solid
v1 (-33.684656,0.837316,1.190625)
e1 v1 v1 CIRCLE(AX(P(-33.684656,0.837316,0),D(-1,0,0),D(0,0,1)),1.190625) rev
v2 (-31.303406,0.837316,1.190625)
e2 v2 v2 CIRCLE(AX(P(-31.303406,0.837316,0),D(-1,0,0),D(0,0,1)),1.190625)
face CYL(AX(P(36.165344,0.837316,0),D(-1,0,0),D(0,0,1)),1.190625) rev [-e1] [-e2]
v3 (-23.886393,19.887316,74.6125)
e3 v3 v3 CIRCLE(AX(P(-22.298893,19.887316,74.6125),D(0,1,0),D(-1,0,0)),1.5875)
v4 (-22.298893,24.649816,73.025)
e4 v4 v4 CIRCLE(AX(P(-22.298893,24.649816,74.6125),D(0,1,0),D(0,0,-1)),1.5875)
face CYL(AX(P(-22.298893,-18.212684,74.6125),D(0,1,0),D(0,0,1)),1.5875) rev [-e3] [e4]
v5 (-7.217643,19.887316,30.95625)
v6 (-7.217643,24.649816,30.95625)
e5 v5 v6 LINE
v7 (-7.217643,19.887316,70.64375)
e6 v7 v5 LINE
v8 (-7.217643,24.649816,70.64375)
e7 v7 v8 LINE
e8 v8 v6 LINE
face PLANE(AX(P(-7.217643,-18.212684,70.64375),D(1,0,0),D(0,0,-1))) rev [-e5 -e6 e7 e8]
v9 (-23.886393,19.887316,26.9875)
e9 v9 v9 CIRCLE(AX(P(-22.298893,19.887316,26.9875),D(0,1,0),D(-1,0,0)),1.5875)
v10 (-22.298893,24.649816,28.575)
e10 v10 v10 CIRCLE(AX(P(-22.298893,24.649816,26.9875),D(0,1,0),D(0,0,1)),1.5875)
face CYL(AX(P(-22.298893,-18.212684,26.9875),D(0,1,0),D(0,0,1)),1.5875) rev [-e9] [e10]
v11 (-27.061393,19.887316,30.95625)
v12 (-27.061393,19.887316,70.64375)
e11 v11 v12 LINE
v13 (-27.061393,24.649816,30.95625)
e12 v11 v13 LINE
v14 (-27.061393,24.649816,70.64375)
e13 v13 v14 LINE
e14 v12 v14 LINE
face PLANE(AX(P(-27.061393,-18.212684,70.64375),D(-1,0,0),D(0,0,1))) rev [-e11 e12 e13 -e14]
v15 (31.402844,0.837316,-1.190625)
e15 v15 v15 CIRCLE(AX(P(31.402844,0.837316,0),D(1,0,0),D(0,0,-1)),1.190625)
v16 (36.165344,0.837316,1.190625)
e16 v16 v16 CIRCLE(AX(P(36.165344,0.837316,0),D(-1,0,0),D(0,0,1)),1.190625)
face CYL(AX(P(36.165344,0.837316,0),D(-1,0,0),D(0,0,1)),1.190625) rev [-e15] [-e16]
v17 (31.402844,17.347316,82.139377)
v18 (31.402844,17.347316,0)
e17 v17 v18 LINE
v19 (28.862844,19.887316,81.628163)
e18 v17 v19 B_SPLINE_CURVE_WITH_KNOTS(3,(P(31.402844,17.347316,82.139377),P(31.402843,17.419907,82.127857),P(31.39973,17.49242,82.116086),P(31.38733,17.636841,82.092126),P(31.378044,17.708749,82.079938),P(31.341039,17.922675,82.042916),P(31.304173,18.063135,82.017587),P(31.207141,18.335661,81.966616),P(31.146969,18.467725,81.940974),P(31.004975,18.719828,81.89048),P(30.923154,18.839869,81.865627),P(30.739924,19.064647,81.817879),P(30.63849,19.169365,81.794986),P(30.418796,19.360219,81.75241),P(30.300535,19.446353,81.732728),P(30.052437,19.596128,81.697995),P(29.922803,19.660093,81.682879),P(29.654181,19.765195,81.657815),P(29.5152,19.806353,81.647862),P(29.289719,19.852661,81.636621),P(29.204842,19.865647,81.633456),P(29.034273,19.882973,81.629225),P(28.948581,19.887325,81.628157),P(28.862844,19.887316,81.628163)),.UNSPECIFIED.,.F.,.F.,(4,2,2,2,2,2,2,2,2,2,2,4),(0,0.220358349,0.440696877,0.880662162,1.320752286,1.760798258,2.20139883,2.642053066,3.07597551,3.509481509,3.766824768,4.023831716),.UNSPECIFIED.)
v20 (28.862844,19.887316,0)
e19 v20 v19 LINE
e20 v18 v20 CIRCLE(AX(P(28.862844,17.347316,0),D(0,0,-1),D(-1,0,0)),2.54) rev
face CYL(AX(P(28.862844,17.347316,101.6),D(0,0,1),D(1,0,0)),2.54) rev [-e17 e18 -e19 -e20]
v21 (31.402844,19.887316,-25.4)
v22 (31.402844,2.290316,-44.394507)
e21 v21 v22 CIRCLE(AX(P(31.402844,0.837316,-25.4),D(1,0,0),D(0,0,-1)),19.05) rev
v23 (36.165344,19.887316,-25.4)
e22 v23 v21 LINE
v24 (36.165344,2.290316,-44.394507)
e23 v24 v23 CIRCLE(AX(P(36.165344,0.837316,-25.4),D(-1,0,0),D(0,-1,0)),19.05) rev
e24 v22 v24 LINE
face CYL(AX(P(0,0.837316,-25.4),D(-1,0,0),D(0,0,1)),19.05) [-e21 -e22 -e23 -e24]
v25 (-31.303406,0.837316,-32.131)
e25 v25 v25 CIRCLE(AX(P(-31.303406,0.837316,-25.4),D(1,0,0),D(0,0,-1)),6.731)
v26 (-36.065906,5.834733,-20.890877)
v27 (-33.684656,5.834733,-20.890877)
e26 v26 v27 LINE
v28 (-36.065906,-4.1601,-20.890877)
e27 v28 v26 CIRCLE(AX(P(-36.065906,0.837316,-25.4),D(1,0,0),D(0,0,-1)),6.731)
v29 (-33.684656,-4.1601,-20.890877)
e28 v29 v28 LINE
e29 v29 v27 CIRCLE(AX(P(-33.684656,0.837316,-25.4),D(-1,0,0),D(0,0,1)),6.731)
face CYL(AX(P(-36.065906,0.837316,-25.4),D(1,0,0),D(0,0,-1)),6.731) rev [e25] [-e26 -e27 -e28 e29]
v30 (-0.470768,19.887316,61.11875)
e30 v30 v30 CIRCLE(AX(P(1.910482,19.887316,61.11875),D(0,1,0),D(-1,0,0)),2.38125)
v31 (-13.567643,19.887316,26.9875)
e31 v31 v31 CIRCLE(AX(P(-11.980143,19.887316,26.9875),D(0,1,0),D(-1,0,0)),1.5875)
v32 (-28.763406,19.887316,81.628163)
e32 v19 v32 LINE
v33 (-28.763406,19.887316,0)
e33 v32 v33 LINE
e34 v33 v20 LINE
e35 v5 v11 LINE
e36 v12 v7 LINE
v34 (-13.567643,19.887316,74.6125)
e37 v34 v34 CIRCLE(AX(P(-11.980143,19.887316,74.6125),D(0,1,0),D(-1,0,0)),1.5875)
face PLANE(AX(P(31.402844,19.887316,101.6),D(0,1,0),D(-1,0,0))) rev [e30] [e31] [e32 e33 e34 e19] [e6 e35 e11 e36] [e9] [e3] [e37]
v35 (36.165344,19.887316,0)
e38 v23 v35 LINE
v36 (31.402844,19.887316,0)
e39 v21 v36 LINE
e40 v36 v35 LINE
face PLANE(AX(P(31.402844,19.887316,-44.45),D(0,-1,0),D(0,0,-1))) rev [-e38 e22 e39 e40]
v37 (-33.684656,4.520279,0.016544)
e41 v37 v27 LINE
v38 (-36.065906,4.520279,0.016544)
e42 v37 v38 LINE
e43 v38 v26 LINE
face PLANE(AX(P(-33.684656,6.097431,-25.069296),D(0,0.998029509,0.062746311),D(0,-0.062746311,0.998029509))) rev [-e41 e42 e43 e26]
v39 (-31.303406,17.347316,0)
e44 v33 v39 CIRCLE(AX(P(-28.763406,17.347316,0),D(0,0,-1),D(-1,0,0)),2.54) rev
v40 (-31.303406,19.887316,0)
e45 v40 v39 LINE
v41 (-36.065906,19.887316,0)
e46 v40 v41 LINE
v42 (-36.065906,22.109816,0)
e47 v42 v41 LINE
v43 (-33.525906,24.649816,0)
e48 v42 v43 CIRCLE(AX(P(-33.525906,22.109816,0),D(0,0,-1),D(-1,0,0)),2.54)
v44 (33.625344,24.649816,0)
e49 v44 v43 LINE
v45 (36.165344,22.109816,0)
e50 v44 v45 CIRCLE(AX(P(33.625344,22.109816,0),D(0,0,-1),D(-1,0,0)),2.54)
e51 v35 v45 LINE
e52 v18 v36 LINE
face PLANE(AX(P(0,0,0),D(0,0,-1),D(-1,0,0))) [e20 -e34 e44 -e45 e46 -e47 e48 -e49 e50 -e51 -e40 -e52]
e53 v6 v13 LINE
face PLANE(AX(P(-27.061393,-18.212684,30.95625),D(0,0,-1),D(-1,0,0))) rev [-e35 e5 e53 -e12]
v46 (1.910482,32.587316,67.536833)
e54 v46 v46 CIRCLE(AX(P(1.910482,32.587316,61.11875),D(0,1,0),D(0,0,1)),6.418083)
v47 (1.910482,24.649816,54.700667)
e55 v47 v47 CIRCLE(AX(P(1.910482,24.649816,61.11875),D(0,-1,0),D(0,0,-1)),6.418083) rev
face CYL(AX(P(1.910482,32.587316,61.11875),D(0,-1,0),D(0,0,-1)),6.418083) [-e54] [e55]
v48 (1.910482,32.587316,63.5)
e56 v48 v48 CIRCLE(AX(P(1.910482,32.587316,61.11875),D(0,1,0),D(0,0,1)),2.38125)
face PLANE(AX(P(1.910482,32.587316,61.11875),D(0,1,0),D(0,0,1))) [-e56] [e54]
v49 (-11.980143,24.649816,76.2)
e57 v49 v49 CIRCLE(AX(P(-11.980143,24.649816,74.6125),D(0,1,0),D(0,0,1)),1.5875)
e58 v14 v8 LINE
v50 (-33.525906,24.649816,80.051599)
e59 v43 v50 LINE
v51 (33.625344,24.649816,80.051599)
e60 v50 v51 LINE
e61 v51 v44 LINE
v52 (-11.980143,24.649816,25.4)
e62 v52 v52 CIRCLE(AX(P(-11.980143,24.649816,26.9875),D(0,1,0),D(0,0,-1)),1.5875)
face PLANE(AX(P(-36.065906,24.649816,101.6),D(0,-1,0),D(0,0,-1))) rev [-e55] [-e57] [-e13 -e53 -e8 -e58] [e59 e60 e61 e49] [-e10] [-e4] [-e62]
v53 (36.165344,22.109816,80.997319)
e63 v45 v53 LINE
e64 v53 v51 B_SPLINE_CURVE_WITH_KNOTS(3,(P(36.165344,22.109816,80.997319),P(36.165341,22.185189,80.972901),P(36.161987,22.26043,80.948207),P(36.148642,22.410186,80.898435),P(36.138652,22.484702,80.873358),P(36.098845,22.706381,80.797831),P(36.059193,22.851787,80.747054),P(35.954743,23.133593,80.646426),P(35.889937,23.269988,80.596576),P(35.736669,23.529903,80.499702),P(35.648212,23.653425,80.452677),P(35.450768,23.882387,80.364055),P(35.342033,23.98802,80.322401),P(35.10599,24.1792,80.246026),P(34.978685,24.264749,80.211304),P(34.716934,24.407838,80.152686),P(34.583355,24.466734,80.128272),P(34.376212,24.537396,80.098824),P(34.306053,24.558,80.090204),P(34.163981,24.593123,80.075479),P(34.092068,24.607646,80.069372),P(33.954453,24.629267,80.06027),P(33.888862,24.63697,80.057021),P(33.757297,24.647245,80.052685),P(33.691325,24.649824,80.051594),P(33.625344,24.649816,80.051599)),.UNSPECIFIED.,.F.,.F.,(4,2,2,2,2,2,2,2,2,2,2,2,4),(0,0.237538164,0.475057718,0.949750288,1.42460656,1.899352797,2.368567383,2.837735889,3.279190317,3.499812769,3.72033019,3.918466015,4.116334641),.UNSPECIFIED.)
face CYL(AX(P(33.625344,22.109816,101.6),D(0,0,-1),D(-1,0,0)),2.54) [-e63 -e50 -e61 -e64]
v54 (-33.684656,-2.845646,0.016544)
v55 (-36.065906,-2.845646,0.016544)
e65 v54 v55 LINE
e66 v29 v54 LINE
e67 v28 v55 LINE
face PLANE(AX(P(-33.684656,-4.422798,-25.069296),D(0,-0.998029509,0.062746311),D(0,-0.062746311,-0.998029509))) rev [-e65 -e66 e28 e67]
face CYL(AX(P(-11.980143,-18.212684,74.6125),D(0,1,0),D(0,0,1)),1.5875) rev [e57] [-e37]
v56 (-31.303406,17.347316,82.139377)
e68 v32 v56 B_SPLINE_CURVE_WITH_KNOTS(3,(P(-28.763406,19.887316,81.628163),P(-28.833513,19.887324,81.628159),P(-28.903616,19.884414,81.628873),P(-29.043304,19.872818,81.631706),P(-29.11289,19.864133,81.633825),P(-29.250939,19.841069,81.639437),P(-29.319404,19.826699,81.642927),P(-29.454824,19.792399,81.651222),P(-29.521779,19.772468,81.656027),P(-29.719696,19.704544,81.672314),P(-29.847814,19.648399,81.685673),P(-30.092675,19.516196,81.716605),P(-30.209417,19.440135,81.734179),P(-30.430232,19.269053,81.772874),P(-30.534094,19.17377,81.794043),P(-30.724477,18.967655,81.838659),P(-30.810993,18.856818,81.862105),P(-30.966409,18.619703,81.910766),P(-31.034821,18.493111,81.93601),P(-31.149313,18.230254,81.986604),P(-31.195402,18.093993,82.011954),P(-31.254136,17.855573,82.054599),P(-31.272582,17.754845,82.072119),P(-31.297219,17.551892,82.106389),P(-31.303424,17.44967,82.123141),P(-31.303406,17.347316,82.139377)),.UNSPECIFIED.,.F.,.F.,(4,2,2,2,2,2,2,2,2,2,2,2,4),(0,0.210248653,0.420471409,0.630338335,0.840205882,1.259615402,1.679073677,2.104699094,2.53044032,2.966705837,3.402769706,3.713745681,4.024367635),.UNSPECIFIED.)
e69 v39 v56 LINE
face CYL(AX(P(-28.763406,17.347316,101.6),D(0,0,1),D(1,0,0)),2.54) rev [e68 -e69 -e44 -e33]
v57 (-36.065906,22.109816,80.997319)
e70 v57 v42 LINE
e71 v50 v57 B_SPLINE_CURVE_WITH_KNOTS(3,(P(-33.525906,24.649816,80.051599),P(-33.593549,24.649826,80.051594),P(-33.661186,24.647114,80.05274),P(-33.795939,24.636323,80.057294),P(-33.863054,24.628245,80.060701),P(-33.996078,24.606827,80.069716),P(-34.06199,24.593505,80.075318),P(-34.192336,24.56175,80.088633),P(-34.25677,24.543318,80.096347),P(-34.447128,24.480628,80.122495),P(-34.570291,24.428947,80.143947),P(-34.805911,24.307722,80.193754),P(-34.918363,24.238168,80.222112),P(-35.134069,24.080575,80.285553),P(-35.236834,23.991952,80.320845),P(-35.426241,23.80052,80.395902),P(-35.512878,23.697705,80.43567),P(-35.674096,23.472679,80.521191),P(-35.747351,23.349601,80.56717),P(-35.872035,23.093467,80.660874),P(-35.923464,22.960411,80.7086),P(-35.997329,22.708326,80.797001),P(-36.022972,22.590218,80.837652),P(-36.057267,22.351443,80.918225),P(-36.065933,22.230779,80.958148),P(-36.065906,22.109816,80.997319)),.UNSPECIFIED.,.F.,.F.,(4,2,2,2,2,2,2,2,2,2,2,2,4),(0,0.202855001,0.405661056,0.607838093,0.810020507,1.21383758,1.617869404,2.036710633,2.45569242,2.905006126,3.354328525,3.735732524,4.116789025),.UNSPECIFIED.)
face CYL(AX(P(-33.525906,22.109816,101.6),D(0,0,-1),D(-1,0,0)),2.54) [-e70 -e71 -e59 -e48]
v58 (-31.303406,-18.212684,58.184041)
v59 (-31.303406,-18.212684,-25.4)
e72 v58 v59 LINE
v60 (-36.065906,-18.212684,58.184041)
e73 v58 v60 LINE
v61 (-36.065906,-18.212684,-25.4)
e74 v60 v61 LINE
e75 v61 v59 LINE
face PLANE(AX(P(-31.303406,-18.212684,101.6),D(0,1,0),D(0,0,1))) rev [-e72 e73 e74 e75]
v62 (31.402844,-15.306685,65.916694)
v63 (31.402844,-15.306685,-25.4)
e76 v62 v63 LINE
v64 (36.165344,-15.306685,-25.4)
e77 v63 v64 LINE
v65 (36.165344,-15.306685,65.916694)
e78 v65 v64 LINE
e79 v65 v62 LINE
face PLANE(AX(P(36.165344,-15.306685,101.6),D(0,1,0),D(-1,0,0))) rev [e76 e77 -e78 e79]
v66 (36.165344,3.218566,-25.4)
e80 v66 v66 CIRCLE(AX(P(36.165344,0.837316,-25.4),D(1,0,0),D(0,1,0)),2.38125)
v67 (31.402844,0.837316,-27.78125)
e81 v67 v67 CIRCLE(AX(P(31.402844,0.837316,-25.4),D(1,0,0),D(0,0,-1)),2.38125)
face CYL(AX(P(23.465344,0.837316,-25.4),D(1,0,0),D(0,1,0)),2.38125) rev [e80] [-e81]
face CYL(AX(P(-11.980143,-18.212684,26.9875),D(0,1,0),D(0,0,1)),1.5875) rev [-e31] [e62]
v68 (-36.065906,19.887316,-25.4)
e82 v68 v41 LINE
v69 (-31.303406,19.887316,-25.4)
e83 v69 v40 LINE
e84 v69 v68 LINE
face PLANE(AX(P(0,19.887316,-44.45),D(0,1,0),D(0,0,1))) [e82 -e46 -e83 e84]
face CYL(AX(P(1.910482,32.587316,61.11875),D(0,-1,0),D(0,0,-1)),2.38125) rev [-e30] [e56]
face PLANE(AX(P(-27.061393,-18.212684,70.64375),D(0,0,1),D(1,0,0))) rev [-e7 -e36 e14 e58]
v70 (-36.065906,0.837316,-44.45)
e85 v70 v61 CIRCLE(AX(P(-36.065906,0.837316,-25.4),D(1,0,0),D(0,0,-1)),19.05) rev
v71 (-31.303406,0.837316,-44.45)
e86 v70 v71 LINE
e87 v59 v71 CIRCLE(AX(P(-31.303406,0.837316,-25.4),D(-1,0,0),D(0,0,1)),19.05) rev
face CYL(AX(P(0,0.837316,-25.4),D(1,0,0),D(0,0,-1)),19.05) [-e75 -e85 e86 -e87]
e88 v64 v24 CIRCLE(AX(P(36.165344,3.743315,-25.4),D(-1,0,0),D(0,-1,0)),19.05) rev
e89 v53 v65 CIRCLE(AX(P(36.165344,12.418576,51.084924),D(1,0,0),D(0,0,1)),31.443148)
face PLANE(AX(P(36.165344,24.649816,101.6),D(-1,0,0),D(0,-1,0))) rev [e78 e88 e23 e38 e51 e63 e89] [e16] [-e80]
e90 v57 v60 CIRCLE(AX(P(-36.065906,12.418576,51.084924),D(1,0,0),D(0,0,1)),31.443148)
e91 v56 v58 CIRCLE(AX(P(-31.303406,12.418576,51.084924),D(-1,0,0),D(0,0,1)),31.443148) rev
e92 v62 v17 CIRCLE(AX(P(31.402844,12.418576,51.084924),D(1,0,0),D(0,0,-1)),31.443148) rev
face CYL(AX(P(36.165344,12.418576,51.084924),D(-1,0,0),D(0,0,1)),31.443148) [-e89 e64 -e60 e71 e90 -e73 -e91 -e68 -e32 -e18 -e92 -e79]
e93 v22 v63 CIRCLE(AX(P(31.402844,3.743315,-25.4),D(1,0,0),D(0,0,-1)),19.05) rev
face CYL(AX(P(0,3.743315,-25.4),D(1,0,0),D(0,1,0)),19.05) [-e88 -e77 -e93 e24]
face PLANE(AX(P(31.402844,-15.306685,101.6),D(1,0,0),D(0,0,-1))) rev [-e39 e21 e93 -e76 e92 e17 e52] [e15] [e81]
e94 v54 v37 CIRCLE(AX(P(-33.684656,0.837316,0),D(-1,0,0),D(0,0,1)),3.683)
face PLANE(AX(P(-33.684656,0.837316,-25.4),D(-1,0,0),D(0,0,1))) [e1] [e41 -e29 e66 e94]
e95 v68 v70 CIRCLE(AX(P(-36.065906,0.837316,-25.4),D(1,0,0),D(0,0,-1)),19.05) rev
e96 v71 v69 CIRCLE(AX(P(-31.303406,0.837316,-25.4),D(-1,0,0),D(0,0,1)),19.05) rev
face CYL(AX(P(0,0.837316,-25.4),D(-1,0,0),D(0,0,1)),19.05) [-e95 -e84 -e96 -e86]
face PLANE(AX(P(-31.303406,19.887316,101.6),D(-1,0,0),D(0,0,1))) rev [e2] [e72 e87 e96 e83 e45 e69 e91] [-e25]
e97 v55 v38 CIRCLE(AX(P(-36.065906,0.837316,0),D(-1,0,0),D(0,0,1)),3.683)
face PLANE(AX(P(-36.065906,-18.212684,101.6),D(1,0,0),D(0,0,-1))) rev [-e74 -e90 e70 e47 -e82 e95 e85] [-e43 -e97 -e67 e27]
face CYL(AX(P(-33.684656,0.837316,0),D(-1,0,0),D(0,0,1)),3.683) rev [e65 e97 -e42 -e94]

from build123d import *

# Parameters (mm, degrees)
BOSS_EXTRUDE1_DEPTH = 101.6
SKETCH2_W           = 4.7625
SKETCH2_H           = 38.1
SKETCH2_H_2         = 35.194001629
BOSS_EXTRUDE2_DEPTH = 44.45
FILLET1_R           = 19.05
FILLET4_R           = 2.54
FILLET5_R           = 2.54
SKETCH4_R           = 1.190625
CUT_EXTRUDE1_DEPTH  = 128.07291971
SKETCH5_R           = 1.5875
SKETCH5_W           = 19.84375
SKETCH5_H           = 39.6875
CUT_EXTRUDE2_DEPTH  = 117.05035969
SKETCH6_R           = 6.418083015
SKETCH6_R_2         = 2.38125
BOSS_EXTRUDE3_DEPTH = 7.9375
SKETCH7_R           = 2.38125
CUT_EXTRUDE3_DEPTH  = 117.05035969
CUT_EXTRUDE4_START  = -12.7
SKETCH8_R           = 1.190625
SKETCH8_R_2         = 2.38125
CUT_EXTRUDE4_DEPTH  = 12.7
CUT_EXTRUDE5_DEPTH  = 2.38125
SKETCH10_R          = 6.731
CUT_EXTRUDE6_DEPTH  = 127.239951738
CUT_EXTRUDE7_DEPTH  = 129.848153517


with BuildPart() as part:
    # Sketch1 → Boss-Extrude1 (new body)
    with BuildSketch(Plane.XY):
        Polygon((-36.065906398, 24.64981637), (36.165343602, 24.64981637), (36.165343602, -15.306685259), (31.402843602, -15.306685259), (31.402843602, 19.88731637), (-31.303406398, 19.88731637), (-31.303406398, -18.21268363), (-36.065906398, -18.21268363), align=None)
    extrude(amount=BOSS_EXTRUDE1_DEPTH)

    # Sketch2 → Boss-Extrude2 (add)
    with BuildSketch(Plane(origin=(0, 0, 0), x_dir=(-1, 0, 0), z_dir=(0, 0, -1))):
        with Locations((33.684656398, 0.83731637)):
            Rectangle(SKETCH2_W, SKETCH2_H)
        with Locations((-33.784093602, 2.290315555)):
            Rectangle(SKETCH2_W, SKETCH2_H_2)
    extrude(amount=BOSS_EXTRUDE2_DEPTH)

    # Fillet1
    # the kernel refuses this fillet: 19.05 mm, written as the material it takes off along each edge
    with BuildSketch(Plane(origin=(16.321593602, -18.21268363, -44.45), x_dir=(0, 0, 1), z_dir=(-1, 0, 0))) as fillet1_piece_1:
        with BuildLine():
            CenterArc((FILLET1_R, FILLET1_R), FILLET1_R, 180, 90)
            Line((0, FILLET1_R), (0, 0))
            Line((0, 0), (FILLET1_R, 0))
        make_face()
    extrude(amount=100.0125, mode=Mode.SUBTRACT)
    with BuildSketch(Plane(origin=(-83.690906398, 19.88731637, -44.45), x_dir=(0, -1, 0), z_dir=(1, 0, 0)), Plane(origin=(83.790343602, -15.306685259, -44.45), x_dir=(0, 1, 0), z_dir=(-1, 0, 0)), Plane(origin=(-16.222156398, 19.88731637, -44.45), x_dir=(0, -1, 0), z_dir=(1, 0, 0))) as fillet1_piece_2:
        with BuildLine():
            CenterArc((FILLET1_R, -FILLET1_R), FILLET1_R, 90, 90)
            Line((0, -FILLET1_R), (0, 0))
            Line((0, 0), (FILLET1_R, 0))
        make_face()
    extrude(amount=100.0125, mode=Mode.SUBTRACT)

    # Fillet4
    fillet4_edges = [part.edges().sort_by_distance(p)[0] for p in [
        (-36.065906398, 24.64981637, 50.8),
        (36.165343602, 24.64981637, 50.8),
        (31.402843602, 19.88731637, 50.8),
        (-31.303406398, 19.88731637, 50.8),
    ]]
    fillet(fillet4_edges, radius=FILLET4_R)

    # Fillet5
    fillet5_edges = [part.edges().sort_by_distance(p)[0] for p in [
        (33.784093602, -15.306685259, 101.6),
        (-33.684656398, -18.21268363, 101.6),
    ]]
    fillet(fillet5_edges, radius=FILLET5_R)

    # Sketch4 → Cut-Extrude1 (cut, through all)
    with BuildSketch(Plane.ZY.offset(36.065906398)):
        with Locations((-25.4, 0.83731637)):
            Circle(SKETCH4_R)
        with Locations((0, 0.83731637)):
            Circle(SKETCH4_R)
    extrude(amount=-CUT_EXTRUDE1_DEPTH, mode=Mode.SUBTRACT)

    # Sketch5 → Cut-Extrude2 (cut, through all)
    with BuildSketch(Plane(origin=(0, 24.64981637, 0), x_dir=(1, 0, 0), z_dir=(0, 1, 0))):
        with Locations(Location((-22.298893396, -26.9875, 0), (0, 0, 270))):
            Circle(SKETCH5_R)
        with Locations(Location((-11.980143396, -26.9875, 0), (0, 0, 180))):
            Circle(SKETCH5_R)
        with Locations(Location((-11.980143396, -74.6125, 0), (0, 0, 270))):
            Circle(SKETCH5_R)
        with Locations(Location((-22.298893396, -74.6125, 0), (0, 0, 180))):
            Circle(SKETCH5_R)
        with Locations((-17.139518396, -50.8)):
            Rectangle(SKETCH5_W, SKETCH5_H)
    extrude(amount=-CUT_EXTRUDE2_DEPTH, mode=Mode.SUBTRACT)

    # Sketch6 → Boss-Extrude3 (add)
    with BuildSketch(Plane(origin=(0, 24.64981637, 0), x_dir=(1, 0, 0), z_dir=(0, 1, 0))):
        with Locations(Location((1.910481604, -61.11875, 0), (0, 0, 90))):
            Circle(SKETCH6_R)
        with Locations(Location((1.910481604, -61.11875, 0), (0, 0, 270))):
            Circle(SKETCH6_R_2, mode=Mode.SUBTRACT)
    extrude(amount=BOSS_EXTRUDE3_DEPTH)

    # Sketch7 → Cut-Extrude3 (cut, through all)
    with BuildSketch(Plane(origin=(0, 24.64981637, 0), x_dir=(1, 0, 0), z_dir=(0, 1, 0))):
        with Locations(Location((1.910481604, -61.11875, 0), (0, 0, 180))):
            Circle(SKETCH7_R)
    extrude(amount=-CUT_EXTRUDE3_DEPTH, mode=Mode.SUBTRACT)

    # Sketch8 → Cut-Extrude4 (cut)
    with BuildSketch(Plane(origin=(36.165343602, 0, 0), x_dir=(0, 0, -1), z_dir=(1, 0, 0)).offset(CUT_EXTRUDE4_START)):
        with Locations(Location((0, 0.83731637, 0), (0, 0, 180))):
            Circle(SKETCH8_R)
        with Locations(Location((25.4, 0.83731637, 0), (0, 0, 90))):
            Circle(SKETCH8_R_2)
    extrude(amount=CUT_EXTRUDE4_DEPTH, mode=Mode.SUBTRACT)

    # Sketch9 → Cut-Extrude5 (cut)
    with BuildSketch(Plane.ZY.offset(36.065906398)):
        with BuildLine():
            Line((-25.069295566, 6.097430896), (0.016544331, 4.520279211))
            ThreePointArc((0.016544331, 4.520279211), (3.683, 0.83731637), (0.016544331, -2.84564647))
            Line((0.016544331, -2.84564647), (-25.069295566, -4.422798156))
            ThreePointArc((-25.069295566, -4.422798156), (-30.6705, 0.83731637), (-25.069295566, 6.097430896))
        make_face()
    extrude(amount=-CUT_EXTRUDE5_DEPTH, mode=Mode.SUBTRACT)

    # Sketch10 → Cut-Extrude6 (cut, through all)
    with BuildSketch(Plane(origin=(-31.303406398, 0, 0), x_dir=(0, 0, -1), z_dir=(1, 0, 0))):
        with Locations((25.4, 0.83731637)):
            Circle(SKETCH10_R)
    extrude(amount=-CUT_EXTRUDE6_DEPTH, mode=Mode.SUBTRACT)

    # Sketch11 → Cut-Extrude7 (cut, through all)
    with BuildSketch(Plane.ZY.offset(36.065906398)):
        with BuildLine():
            Line((78.230942549, 28.285686863), (107.145035189, 28.285686863))
            Line((107.145035189, 28.285686863), (107.145035189, -25.578978537))
            Line((107.145035189, -25.578978537), (47.434592149, -25.578978537))
            Line((47.434592149, -25.578978537), (47.434592149, -18.811963789))
            ThreePointArc((47.434592149, -18.811963789), (77.401439504, -4.789344682), (78.230942549, 28.285686863))
        make_face()
    extrude(amount=-CUT_EXTRUDE7_DEPTH, mode=Mode.SUBTRACT)


solid = part.part
